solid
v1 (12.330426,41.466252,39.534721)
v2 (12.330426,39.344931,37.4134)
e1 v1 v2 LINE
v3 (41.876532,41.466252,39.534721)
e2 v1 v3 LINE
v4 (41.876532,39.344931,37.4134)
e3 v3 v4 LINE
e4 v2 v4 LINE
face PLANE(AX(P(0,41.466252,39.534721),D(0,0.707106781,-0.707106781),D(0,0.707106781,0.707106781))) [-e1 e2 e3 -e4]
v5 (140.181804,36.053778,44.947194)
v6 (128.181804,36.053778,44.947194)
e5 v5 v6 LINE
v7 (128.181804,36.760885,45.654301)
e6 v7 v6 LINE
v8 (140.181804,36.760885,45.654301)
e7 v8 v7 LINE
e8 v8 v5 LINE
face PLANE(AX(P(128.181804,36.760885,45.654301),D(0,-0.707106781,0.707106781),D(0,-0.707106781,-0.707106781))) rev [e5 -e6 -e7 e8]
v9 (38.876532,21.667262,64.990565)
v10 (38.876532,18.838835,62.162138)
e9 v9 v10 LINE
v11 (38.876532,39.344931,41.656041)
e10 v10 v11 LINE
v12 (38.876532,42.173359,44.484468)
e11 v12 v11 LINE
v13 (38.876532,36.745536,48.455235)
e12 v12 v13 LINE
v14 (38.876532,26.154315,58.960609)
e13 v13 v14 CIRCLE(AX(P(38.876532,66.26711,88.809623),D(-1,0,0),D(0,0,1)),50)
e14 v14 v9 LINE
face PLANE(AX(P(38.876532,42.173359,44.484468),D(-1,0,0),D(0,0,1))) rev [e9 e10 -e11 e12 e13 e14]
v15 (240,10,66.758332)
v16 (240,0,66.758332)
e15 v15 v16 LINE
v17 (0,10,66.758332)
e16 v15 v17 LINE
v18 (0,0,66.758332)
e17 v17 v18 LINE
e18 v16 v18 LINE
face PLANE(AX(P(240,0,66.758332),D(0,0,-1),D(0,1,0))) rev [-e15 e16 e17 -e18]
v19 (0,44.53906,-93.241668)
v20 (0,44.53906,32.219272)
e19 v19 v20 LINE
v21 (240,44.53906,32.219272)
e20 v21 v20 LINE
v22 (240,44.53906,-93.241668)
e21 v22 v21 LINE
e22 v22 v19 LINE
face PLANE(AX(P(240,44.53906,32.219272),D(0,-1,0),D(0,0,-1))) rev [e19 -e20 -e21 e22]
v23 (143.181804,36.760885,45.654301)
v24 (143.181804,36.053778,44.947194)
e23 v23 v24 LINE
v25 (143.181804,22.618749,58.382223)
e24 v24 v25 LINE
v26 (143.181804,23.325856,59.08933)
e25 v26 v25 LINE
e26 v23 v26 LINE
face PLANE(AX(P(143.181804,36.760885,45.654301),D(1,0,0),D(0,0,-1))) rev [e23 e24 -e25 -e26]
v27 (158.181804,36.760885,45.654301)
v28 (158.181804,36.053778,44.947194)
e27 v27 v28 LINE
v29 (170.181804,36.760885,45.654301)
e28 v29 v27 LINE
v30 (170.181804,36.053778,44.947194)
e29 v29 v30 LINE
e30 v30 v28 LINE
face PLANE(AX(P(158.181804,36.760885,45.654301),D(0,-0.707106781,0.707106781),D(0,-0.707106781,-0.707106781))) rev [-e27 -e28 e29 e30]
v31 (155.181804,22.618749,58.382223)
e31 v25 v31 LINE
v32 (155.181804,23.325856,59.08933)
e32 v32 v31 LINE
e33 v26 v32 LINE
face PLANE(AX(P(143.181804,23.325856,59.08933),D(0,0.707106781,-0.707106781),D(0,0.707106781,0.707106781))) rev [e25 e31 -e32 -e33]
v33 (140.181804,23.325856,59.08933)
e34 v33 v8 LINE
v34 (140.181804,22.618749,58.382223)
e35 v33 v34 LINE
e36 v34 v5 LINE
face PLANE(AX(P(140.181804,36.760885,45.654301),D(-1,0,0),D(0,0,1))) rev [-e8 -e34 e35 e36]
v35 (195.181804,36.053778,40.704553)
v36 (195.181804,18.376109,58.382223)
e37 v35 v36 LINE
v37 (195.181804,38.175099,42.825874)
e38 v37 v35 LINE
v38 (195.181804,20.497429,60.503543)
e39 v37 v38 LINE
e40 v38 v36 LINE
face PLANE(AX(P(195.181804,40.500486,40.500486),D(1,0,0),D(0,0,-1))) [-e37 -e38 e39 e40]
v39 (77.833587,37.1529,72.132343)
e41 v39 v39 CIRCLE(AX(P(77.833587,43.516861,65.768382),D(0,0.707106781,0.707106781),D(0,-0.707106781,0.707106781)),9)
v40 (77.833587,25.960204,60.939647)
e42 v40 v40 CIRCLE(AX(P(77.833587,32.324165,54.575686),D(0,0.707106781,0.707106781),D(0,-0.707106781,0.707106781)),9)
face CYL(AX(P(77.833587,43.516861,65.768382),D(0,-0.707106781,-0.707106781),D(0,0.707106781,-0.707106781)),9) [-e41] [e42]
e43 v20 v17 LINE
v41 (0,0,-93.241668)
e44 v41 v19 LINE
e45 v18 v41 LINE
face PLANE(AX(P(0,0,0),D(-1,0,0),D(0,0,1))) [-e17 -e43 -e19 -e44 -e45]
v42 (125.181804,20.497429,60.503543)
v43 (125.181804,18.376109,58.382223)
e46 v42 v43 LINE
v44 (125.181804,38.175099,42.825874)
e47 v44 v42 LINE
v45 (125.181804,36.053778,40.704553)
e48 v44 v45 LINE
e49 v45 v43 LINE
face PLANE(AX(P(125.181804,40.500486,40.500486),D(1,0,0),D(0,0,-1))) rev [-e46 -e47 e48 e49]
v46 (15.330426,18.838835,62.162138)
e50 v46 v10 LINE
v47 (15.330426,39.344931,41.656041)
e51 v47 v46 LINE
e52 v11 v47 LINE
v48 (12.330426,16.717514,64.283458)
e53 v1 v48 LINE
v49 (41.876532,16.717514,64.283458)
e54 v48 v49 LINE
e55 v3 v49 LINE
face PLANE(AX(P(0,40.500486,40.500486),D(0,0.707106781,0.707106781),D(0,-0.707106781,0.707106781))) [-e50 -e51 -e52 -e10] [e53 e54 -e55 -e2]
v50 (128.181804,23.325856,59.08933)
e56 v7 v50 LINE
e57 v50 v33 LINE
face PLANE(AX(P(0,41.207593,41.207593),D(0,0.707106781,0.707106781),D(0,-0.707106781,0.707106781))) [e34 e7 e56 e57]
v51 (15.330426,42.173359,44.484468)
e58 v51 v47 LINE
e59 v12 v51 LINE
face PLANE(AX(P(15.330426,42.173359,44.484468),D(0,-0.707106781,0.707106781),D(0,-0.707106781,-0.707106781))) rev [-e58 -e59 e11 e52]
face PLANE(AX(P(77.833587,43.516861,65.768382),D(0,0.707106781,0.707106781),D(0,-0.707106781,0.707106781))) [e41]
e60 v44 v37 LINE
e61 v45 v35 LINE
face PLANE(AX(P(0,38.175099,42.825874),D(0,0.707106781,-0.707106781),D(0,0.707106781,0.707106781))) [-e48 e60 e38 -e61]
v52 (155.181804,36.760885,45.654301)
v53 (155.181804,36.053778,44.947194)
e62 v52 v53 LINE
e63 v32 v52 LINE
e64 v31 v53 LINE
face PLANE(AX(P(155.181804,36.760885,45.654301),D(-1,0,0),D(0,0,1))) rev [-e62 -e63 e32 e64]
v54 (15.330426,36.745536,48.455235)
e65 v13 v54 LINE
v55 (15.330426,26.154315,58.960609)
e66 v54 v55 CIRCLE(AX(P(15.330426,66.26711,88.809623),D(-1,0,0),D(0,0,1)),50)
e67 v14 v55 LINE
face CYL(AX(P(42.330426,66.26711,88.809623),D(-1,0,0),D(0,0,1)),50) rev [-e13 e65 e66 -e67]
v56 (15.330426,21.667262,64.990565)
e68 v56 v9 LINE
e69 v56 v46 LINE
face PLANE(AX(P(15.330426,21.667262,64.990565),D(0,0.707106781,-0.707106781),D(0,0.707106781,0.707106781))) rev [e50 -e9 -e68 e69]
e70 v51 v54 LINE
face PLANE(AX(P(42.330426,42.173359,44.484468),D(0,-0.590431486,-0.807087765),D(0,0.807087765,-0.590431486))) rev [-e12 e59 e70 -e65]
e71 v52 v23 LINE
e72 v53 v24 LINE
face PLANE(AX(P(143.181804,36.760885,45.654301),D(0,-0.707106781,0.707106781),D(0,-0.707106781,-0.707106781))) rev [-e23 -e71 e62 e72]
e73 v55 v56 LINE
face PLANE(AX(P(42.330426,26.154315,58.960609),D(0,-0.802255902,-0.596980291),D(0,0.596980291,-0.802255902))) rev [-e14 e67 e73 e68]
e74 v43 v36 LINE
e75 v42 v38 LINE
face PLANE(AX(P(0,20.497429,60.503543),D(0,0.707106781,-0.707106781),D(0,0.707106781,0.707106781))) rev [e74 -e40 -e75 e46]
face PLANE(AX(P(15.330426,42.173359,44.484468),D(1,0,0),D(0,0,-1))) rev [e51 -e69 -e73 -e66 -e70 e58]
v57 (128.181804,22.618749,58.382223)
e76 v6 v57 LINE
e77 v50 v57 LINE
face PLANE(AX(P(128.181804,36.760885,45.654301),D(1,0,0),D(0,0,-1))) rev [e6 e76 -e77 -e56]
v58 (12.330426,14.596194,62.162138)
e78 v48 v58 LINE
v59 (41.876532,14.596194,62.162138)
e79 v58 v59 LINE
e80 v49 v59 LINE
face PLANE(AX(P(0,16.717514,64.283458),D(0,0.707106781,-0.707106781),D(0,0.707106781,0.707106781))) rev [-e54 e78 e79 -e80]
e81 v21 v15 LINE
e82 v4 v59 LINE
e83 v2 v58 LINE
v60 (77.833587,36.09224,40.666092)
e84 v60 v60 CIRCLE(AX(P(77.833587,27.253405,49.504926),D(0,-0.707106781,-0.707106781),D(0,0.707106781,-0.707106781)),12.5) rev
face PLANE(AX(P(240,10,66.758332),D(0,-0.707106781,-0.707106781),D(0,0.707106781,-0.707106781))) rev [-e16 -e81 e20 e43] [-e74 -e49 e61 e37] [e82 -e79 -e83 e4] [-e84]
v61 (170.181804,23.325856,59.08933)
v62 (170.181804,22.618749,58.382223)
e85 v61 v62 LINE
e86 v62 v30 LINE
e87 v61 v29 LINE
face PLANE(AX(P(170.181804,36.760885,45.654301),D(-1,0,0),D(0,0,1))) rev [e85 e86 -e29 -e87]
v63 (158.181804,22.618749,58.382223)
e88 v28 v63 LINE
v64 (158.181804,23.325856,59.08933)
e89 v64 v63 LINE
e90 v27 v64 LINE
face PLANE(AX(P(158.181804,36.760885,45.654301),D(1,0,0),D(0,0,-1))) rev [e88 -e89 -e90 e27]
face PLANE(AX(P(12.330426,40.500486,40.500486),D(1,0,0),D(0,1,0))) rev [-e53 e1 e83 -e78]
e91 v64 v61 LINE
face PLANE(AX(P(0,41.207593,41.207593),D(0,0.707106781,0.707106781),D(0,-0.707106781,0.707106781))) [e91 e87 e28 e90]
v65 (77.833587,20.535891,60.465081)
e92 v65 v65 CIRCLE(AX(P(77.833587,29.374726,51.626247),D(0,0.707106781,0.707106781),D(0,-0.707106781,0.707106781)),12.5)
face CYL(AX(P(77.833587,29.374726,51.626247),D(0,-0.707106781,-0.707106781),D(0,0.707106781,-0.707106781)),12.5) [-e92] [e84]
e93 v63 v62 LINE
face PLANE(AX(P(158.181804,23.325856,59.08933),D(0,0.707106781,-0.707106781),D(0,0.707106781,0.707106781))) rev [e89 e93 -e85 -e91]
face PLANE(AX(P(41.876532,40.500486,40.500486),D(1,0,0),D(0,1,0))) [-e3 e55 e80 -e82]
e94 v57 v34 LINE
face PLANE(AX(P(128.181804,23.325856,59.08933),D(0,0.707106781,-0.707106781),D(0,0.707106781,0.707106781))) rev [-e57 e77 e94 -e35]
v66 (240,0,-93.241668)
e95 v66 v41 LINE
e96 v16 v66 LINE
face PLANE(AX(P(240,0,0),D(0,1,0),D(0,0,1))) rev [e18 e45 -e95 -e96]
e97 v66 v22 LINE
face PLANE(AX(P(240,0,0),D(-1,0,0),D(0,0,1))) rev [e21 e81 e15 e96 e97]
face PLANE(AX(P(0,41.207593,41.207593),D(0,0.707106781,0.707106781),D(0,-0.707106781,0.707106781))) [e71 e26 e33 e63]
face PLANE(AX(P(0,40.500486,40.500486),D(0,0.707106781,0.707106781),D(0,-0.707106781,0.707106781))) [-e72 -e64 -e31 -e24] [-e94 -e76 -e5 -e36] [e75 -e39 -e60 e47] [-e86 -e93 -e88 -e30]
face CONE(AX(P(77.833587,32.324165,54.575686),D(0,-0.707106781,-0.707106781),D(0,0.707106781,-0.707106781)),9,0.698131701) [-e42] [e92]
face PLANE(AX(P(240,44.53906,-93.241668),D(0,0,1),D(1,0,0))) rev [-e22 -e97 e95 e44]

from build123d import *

# Parameters (mm, degrees)
BOSS_EXTRUDE1_DEPTH = 240
SKETCH2_W           = 70
SKETCH2_H           = 25
SKETCH2_W_2         = 29.546106777
SKETCH2_H_2         = 35
SKETCH2_R           = 12.5
BOSS_EXTRUDE2_DEPTH = 3
SKETCH3_R           = 9
BOSS_EXTRUDE3_DEPTH = 20
CHAMFER1_SIZE2      = 4.171137574
CHAMFER1_SIZE       = 3.5
SKETCH4_W           = 23.546106777
SKETCH4_H           = 29
BOSS_EXTRUDE4_DEPTH = 4
CUT_EXTRUDE1_DEPTH  = 27
SKETCH6_W           = 12
SKETCH6_H           = 19
BOSS_EXTRUDE5_DEPTH = 1


with BuildPart() as part:
    # Sketch1 → Boss-Extrude1 (new body)
    with BuildSketch(Plane(origin=(0, 0, 0), x_dir=(0, 0, -1), z_dir=(1, 0, 0))):
        Polygon((0, 0), (-66.758331831, 0), (-66.758331831, 10), (-32.219272119, 44.539059712), (93.241668169, 44.539059712), (93.241668169, 0), align=None)
    extrude(amount=BOSS_EXTRUDE1_DEPTH)

    # Sketch2 → Boss-Extrude2 (add)
    with BuildSketch(Plane(origin=(0, 38.379165915, 38.379165915), x_dir=(1, 0, 0), z_dir=(0, 0.7071067811865298, 0.7071067811865652))):
        with Locations((160.181803508, -15.788594651)):
            Rectangle(SKETCH2_W, SKETCH2_H)
        with Locations((27.103479103, -16.134201326)):
            Rectangle(SKETCH2_W_2, SKETCH2_H_2)
        with Locations(Location((77.833586966, -15.734201326, 0), (0, 0, 90))):
            Circle(SKETCH2_R)
    extrude(amount=BOSS_EXTRUDE2_DEPTH)

    # Sketch3 → Boss-Extrude3 (add)
    with BuildSketch(Plane(origin=(0, 40.500486259, 40.500486259), x_dir=(1, 0, 0), z_dir=(0, 0.7071067811865298, 0.7071067811865652))):
        with Locations(Location((77.833586966, -15.734201326, 0), (0, 0, 90))):
            Circle(SKETCH3_R)
    extrude(amount=BOSS_EXTRUDE3_DEPTH)

    # Chamfer1
    chamfer1_edges = [part.edges().sort_by_distance(p)[0] for p in [
        (77.833586966, 23.010764774, 57.990207744),
    ]]
    chamfer1_side = [part.faces().sort_by_distance(p)[0] for p in [
        (77.833586966, 22.961267299, 58.039705219),
    ]]
    chamfer(chamfer1_edges, length=CHAMFER1_SIZE - 0.0001, length2=CHAMFER1_SIZE2 - 0.0001, reference=chamfer1_side[0])  # a hair under: the kernel refuses the full size

    # Sketch4 → Boss-Extrude4 (add)
    with BuildSketch(Plane(origin=(0, 40.500486259, 40.500486259), x_dir=(1, 0, 0), z_dir=(0, 0.7071067811865298, 0.7071067811865652))):
        with Locations((27.103479102, -16.134201326)):
            Rectangle(SKETCH4_W, SKETCH4_H)
    extrude(amount=BOSS_EXTRUDE4_DEPTH)

    # Sketch5 → Cut-Extrude1 (cut)
    with BuildSketch(Plane.ZY.offset(-15.330425714)):
        with BuildLine():
            Line((44.484468223, 42.173358544), (48.455235169, 36.745535854))
            ThreePointArc((48.455235169, 36.745535854), (53.310708919, 31.055931968), (58.960608868, 26.154315063))
            Line((58.960608868, 26.154315063), (64.990564878, 21.66726189))
            Line((64.990564878, 21.66726189), (44.484468223, 42.173358544))
        make_face()
    extrude(amount=-CUT_EXTRUDE1_DEPTH, mode=Mode.SUBTRACT)

    # Sketch6 → Boss-Extrude5 (add)
    with BuildSketch(Plane(origin=(0, 40.500486259, 40.500486259), x_dir=(1, 0, 0), z_dir=(0, 0.7071067811865298, 0.7071067811865652))):
        with Locations((134.181803508, -15.788594651)):
            Rectangle(SKETCH6_W, SKETCH6_H)
        with Locations((149.181803508, -15.788594651)):
            Rectangle(SKETCH6_W, SKETCH6_H)
        with Locations((164.181803508, -15.788594651)):
            Rectangle(SKETCH6_W, SKETCH6_H)
    extrude(amount=BOSS_EXTRUDE5_DEPTH)


solid = part.part
